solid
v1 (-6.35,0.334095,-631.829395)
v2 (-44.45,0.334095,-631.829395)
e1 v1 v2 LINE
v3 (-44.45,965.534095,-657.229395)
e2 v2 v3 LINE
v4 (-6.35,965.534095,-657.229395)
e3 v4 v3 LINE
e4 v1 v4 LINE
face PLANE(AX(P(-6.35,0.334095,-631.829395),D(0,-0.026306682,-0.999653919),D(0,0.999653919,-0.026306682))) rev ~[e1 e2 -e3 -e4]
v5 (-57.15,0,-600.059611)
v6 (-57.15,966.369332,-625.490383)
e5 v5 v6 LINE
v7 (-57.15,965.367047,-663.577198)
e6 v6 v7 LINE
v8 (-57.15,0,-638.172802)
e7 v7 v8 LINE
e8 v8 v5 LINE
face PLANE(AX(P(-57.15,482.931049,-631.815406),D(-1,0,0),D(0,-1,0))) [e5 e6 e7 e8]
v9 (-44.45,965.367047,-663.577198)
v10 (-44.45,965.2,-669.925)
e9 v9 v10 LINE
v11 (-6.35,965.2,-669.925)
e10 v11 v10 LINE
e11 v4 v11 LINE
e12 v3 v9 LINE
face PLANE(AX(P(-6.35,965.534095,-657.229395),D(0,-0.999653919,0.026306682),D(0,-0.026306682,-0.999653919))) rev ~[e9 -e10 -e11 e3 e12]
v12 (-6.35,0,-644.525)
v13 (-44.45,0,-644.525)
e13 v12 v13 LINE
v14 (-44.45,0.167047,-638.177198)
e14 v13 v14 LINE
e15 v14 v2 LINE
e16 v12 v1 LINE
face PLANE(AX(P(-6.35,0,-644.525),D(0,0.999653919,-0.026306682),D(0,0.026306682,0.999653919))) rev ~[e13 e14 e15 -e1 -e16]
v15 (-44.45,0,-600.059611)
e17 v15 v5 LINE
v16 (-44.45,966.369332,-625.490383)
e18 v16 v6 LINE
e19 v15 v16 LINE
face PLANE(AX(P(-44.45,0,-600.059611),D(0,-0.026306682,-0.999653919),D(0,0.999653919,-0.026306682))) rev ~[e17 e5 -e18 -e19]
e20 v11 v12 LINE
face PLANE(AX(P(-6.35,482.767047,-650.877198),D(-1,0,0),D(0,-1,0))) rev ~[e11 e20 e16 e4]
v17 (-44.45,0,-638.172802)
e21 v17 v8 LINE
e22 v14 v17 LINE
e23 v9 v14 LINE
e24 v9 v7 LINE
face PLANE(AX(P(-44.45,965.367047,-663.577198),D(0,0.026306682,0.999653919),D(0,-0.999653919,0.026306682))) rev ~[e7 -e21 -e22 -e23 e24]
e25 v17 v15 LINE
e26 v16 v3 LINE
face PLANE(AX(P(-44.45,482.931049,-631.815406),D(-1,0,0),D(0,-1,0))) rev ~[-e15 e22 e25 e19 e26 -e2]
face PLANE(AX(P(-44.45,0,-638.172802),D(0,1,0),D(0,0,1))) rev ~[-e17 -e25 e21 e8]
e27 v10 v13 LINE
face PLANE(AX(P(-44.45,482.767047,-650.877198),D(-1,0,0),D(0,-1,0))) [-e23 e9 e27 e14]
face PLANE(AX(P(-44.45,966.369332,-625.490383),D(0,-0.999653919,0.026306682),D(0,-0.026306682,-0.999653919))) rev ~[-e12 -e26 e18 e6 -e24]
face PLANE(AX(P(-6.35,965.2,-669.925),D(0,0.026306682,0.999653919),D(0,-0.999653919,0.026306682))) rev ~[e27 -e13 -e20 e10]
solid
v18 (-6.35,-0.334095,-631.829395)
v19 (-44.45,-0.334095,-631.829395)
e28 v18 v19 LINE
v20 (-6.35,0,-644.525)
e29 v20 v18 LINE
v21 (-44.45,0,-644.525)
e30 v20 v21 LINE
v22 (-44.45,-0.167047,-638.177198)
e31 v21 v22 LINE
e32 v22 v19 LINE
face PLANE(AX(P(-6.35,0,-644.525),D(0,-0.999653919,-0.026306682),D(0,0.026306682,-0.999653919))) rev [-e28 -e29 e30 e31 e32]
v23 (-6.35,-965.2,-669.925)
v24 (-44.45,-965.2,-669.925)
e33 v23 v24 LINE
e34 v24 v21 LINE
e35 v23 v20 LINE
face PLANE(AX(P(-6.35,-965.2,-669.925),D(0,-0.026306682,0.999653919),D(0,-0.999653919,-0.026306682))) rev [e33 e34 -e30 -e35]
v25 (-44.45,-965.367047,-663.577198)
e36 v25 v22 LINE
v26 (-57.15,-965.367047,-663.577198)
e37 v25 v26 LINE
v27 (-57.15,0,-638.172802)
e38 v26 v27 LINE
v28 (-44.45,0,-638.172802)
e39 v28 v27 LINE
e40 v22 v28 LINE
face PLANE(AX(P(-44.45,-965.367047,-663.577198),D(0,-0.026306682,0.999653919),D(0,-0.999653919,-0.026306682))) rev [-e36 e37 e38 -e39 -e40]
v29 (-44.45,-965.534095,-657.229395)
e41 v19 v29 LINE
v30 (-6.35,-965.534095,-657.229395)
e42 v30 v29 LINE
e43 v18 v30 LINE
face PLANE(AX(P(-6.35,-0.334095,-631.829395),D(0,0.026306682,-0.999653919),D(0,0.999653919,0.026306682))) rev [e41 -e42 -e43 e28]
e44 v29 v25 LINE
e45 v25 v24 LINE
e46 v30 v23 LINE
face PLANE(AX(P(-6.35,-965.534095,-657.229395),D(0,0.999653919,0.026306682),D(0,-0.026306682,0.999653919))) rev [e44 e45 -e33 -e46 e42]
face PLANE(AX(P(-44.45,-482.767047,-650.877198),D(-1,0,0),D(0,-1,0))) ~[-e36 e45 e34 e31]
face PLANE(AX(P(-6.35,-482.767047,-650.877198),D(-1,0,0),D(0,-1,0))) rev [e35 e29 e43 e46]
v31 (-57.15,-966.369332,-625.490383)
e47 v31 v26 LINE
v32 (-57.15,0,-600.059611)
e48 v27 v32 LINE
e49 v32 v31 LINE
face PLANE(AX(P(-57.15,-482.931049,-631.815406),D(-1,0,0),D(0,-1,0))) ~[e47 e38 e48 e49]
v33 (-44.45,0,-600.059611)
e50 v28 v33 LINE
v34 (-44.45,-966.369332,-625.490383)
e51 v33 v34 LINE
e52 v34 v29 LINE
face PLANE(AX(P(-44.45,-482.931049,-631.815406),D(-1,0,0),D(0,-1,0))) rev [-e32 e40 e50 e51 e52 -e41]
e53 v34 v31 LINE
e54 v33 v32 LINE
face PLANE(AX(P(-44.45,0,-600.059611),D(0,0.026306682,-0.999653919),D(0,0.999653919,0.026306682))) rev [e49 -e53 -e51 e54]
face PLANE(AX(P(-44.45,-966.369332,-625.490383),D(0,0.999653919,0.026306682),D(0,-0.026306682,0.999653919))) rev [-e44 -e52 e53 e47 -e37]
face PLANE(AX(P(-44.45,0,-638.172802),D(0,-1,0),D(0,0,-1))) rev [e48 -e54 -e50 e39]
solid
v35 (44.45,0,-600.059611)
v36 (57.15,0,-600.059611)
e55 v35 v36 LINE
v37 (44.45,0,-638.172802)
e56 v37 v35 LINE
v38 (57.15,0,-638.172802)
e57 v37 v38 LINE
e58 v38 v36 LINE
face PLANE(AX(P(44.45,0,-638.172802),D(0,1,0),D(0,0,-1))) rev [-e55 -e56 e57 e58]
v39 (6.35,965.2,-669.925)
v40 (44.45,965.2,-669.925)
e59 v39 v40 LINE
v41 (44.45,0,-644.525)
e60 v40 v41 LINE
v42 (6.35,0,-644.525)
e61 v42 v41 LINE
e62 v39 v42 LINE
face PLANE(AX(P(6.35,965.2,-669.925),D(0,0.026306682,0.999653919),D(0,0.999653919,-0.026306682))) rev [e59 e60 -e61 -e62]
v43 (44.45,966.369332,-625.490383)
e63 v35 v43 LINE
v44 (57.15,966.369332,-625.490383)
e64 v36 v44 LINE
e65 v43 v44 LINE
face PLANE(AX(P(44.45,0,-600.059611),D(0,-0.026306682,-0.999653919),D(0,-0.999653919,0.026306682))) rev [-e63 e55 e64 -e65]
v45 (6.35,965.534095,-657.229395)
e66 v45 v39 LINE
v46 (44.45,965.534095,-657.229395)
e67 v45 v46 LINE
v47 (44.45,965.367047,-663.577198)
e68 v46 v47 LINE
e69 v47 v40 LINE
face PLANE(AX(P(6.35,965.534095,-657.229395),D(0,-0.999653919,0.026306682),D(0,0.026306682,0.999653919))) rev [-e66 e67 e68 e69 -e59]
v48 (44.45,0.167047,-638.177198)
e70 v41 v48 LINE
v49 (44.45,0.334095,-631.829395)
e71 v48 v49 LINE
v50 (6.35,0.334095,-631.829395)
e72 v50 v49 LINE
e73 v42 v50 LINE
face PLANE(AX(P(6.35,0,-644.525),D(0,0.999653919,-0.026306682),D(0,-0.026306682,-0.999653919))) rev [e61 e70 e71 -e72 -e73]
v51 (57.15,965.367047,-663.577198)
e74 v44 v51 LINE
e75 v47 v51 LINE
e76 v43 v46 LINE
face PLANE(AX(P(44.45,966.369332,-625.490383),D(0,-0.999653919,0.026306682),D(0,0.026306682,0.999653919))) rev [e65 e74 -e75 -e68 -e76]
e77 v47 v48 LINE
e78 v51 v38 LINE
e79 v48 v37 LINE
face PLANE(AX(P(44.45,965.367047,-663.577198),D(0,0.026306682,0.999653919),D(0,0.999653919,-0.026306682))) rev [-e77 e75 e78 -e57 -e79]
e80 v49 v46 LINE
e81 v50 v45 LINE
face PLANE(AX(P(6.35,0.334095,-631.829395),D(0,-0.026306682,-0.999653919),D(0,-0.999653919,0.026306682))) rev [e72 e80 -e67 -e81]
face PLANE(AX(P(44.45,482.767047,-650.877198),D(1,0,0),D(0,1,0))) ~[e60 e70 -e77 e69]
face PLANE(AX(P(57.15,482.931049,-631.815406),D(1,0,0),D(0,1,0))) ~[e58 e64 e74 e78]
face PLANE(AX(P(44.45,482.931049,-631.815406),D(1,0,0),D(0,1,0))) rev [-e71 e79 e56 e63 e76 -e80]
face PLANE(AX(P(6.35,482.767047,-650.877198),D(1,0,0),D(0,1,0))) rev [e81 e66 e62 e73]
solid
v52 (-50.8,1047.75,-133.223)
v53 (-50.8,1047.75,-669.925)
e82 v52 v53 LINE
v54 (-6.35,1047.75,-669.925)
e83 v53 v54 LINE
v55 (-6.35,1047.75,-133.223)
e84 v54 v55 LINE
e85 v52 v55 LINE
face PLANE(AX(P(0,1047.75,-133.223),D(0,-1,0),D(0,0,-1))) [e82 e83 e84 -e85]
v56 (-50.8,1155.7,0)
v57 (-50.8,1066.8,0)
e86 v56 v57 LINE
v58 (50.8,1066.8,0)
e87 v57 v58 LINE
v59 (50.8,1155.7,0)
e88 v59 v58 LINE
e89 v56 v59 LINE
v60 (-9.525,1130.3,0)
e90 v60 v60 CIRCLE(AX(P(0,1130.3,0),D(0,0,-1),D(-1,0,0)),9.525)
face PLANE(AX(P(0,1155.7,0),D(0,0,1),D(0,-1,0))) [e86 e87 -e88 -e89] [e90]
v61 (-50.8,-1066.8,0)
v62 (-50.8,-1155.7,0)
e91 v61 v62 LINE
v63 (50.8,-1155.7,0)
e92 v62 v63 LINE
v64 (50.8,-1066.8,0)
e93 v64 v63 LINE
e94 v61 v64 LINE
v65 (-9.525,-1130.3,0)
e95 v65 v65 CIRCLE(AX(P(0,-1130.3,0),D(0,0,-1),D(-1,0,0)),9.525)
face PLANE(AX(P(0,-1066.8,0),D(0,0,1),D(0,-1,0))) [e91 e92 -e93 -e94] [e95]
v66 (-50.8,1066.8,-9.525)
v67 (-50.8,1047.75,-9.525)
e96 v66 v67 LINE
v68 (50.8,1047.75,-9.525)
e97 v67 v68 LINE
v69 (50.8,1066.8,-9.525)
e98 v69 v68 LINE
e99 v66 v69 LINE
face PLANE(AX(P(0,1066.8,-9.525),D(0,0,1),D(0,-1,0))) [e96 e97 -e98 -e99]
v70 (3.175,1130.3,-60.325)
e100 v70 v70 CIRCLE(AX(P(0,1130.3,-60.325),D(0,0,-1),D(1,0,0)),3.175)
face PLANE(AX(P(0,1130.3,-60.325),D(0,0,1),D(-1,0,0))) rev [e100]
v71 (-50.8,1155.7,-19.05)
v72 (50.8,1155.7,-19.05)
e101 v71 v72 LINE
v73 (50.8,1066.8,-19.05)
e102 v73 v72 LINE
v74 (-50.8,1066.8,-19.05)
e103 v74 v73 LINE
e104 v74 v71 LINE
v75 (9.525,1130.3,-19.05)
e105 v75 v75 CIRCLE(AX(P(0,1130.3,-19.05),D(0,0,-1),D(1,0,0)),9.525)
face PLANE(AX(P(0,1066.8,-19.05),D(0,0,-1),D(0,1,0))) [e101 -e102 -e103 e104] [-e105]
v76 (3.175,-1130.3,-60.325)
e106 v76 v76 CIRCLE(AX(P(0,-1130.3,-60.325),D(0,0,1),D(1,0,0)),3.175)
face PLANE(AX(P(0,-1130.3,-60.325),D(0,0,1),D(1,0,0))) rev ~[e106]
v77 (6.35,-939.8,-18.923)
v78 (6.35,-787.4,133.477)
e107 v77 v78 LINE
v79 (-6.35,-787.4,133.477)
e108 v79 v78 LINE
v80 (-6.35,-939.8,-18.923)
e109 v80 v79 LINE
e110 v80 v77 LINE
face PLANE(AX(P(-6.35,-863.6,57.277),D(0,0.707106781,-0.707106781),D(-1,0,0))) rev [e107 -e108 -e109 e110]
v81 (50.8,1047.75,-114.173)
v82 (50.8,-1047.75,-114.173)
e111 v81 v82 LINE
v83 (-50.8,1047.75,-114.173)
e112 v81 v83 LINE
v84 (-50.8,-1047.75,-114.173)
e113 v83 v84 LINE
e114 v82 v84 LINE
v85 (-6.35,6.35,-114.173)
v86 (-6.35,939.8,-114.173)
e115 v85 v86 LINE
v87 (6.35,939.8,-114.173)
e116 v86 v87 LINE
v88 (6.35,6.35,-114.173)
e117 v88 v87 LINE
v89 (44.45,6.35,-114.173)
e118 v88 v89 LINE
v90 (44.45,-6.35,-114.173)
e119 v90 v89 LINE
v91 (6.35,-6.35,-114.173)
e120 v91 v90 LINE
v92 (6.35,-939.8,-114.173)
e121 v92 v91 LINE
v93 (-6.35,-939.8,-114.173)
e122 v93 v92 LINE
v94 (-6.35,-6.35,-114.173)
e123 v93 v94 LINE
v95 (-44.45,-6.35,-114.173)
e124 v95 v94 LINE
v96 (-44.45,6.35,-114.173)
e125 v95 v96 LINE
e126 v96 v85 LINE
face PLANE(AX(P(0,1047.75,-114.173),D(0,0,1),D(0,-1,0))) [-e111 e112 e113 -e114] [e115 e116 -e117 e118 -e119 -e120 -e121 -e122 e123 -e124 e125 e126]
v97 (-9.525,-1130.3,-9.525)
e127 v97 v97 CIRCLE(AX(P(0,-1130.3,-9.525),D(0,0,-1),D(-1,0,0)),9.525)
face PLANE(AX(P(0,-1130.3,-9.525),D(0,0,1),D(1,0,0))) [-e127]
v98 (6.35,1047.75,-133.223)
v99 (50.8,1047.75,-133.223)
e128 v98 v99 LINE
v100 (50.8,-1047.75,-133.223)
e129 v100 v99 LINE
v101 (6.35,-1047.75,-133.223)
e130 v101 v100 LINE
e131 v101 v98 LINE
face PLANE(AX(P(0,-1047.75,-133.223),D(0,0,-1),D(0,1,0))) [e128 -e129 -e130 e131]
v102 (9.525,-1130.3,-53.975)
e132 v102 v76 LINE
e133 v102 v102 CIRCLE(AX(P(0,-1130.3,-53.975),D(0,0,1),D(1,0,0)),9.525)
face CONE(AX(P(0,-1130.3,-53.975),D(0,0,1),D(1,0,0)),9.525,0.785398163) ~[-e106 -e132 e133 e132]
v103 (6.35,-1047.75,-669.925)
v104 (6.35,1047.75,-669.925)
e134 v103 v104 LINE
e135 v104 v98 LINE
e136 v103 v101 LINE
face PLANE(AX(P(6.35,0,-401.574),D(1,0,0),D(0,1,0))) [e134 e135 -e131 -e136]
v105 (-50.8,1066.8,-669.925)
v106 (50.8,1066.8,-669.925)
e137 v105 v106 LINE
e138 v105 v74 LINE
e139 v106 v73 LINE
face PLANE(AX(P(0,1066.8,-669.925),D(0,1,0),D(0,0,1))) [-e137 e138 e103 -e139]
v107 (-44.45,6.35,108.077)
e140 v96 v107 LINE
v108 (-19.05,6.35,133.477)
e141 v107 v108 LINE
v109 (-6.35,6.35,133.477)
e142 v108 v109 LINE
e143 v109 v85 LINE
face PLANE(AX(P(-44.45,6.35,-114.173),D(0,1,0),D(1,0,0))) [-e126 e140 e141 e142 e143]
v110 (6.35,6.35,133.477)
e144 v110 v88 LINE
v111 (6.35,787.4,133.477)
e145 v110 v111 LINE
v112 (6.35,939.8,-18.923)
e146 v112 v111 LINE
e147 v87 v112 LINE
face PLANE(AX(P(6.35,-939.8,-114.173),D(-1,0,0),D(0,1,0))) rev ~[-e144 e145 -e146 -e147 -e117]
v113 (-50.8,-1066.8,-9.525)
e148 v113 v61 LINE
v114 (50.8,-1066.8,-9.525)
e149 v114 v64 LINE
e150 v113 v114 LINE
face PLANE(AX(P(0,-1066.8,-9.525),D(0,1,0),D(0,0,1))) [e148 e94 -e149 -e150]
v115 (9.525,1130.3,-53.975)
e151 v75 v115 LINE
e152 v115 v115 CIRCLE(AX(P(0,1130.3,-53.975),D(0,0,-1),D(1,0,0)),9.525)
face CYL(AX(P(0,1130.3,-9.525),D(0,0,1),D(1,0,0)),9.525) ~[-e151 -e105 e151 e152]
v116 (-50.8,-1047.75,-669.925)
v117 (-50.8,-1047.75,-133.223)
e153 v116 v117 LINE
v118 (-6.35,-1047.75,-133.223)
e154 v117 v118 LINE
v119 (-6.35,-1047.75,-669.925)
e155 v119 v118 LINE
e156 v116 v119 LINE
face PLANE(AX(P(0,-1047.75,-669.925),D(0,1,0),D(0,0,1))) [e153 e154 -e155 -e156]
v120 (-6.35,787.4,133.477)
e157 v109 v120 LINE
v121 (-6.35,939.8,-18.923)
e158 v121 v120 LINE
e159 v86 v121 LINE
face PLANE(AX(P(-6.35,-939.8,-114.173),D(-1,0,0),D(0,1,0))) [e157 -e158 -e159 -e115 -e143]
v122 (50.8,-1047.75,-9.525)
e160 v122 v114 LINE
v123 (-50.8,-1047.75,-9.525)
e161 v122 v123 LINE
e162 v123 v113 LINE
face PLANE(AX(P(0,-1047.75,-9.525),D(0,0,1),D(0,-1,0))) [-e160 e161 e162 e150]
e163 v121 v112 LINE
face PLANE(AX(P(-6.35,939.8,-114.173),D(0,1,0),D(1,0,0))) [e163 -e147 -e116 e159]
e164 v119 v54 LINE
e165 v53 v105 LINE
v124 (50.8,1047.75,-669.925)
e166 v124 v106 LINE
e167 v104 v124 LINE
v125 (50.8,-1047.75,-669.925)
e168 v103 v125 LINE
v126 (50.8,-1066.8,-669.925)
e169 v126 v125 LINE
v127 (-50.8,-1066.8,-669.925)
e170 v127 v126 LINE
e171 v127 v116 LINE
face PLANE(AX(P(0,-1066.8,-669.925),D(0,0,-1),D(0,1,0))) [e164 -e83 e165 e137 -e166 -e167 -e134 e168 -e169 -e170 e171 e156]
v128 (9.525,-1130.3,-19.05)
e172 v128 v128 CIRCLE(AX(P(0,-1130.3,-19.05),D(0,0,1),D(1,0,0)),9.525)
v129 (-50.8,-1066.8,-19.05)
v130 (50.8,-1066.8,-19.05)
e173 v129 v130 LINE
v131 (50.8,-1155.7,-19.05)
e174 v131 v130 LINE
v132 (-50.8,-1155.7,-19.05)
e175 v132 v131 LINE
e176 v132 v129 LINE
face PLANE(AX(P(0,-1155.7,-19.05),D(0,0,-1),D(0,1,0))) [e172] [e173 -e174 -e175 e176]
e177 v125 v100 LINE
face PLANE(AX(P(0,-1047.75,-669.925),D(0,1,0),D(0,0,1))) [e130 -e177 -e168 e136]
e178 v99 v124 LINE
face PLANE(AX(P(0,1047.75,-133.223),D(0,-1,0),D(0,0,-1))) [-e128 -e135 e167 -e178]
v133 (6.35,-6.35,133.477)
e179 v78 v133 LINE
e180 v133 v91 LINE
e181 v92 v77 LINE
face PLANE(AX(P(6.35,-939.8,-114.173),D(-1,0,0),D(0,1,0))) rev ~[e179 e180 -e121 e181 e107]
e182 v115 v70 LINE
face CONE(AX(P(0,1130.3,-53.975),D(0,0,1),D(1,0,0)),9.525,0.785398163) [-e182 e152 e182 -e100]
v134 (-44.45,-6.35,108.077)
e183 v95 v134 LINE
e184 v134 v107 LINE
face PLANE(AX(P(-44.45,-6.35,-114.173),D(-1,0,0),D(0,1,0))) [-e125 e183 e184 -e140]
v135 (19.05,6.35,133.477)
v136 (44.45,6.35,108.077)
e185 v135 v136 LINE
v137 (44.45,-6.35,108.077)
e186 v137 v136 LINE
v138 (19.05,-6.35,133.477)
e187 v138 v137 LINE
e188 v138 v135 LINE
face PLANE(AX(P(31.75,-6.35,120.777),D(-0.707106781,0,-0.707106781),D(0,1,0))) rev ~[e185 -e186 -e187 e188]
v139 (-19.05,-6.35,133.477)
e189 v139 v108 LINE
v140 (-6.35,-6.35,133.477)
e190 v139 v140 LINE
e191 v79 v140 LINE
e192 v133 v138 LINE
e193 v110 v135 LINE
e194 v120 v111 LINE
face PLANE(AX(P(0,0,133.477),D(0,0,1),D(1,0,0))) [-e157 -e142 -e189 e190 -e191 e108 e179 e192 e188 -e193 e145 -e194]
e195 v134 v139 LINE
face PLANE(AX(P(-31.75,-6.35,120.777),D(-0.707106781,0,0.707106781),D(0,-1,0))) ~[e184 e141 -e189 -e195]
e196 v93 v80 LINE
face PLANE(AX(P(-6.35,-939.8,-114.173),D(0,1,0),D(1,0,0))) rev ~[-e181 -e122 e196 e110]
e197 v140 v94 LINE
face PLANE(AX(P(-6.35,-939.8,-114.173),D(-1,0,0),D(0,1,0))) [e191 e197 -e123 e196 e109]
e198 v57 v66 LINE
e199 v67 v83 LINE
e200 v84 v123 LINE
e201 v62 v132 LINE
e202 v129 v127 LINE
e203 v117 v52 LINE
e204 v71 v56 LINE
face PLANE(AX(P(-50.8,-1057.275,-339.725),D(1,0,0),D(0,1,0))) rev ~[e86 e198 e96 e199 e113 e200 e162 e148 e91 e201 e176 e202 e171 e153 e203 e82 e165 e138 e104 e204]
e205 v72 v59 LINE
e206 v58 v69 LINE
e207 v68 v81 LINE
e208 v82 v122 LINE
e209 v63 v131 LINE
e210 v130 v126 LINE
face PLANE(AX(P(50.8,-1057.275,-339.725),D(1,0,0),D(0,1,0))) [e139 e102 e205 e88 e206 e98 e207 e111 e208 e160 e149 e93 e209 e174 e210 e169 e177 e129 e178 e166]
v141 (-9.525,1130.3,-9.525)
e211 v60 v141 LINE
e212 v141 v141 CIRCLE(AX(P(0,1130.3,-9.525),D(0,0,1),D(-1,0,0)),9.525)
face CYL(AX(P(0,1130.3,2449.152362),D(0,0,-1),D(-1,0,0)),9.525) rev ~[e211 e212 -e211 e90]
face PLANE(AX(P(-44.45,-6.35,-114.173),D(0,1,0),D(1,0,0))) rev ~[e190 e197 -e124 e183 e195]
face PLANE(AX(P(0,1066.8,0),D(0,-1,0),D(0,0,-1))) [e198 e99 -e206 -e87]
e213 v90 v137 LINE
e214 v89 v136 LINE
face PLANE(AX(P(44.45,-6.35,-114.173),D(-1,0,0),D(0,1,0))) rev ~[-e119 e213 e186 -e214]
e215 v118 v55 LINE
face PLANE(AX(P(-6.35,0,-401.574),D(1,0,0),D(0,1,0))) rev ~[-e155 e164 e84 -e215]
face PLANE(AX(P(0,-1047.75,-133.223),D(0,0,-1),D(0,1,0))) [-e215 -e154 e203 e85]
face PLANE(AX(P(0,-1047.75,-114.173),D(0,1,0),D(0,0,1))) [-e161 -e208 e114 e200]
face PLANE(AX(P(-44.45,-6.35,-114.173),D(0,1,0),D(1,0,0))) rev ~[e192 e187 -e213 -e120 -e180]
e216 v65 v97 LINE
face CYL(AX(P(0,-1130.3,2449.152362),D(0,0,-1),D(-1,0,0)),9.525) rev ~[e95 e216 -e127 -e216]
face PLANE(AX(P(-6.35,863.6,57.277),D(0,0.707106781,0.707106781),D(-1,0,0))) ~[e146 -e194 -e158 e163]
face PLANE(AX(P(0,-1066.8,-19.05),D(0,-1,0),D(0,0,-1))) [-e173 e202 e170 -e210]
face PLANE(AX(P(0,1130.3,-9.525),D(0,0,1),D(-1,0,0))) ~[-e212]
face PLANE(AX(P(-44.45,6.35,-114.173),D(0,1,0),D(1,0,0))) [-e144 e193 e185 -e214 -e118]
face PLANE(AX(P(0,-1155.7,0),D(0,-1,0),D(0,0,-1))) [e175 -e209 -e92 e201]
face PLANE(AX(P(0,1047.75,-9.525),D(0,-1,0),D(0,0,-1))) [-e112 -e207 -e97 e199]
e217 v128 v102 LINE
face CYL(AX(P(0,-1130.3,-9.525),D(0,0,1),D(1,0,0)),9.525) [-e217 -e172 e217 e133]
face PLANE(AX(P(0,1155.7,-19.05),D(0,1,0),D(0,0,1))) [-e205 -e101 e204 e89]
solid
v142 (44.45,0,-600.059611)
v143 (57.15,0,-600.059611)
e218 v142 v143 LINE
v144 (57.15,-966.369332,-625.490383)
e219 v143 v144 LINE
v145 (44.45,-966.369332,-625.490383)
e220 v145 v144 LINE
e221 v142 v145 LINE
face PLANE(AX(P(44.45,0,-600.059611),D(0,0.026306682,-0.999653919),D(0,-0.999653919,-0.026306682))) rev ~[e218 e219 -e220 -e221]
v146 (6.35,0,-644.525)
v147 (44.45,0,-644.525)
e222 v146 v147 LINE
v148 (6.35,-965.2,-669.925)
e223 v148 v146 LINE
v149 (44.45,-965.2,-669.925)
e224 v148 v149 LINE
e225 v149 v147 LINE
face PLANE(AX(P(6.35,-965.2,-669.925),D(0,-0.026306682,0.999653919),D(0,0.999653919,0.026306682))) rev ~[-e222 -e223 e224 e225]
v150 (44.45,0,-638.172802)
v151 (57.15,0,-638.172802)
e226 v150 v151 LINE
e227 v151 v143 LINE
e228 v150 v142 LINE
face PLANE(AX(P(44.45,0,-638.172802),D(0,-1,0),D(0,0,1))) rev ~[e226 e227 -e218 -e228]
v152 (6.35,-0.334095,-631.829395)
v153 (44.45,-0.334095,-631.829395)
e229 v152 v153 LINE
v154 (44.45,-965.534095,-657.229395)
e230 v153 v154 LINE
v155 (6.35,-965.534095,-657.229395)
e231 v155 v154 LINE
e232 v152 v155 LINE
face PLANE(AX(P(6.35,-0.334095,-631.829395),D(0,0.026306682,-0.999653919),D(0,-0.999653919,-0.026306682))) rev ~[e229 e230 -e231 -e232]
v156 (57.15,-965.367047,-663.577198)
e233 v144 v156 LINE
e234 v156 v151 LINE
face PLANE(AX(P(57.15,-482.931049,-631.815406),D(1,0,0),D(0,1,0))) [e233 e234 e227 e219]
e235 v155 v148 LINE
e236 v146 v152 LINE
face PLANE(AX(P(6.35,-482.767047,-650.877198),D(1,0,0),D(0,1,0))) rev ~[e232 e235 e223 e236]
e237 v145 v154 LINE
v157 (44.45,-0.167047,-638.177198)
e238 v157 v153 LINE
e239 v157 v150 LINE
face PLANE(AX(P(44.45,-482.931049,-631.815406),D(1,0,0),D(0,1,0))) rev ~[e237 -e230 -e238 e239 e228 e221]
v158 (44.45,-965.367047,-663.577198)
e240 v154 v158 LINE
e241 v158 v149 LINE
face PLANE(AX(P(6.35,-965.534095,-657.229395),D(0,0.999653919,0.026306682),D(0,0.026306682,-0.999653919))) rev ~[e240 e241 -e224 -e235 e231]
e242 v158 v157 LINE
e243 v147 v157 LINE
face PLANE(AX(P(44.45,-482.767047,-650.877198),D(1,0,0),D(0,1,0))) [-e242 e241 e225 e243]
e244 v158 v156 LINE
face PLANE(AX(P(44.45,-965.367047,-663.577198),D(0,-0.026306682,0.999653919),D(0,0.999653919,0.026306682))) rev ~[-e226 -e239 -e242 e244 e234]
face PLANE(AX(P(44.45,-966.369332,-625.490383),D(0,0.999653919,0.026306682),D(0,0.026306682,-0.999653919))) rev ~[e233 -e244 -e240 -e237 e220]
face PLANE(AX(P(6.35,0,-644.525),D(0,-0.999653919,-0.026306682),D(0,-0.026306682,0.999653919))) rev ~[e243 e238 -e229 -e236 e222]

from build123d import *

# Parameters (mm, degrees)
F0_W      = 1047.75
F0_H      = 19.05
F1_DEPTH  = 50.8
F2_W      = 2095.5
F2_H      = 536.702
F3_DEPTH  = 6.35
F4_W      = 12.7
F4_H      = 1879.6
F5_DEPTH  = 247.65
F6_SIZE   = 152.4
F7_W      = 88.9
F7_H      = 12.7
F8_DEPTH  = 247.65
F9_SIZE   = 25.4
F11_D     = 19.05
F13_R     = 9.525
F14_DEPTH = 50.8
F15_SIZE  = 6.35
F18_DEPTH = 38.1
F20_DEPTH = 12.7


with BuildPart() as f1:
    # F0 (on Right) → F1 (new body, symmetric)
    with BuildSketch(Plane.YZ):
        Polygon((-1047.75, -9.525), (-1066.8, -9.525), (-1066.8, -19.05), (-1066.8, -669.925), (-1047.75, -669.925), (-1047.75, -133.223), (-1047.75, -114.173), align=None)
        Polygon((-1066.8, 0), (-1155.7, 0), (-1155.7, -19.05), (-1066.8, -19.05), (-1066.8, -9.525), align=None)
        with Locations((-523.875, -123.698)):
            Rectangle(F0_W, F0_H)
        with Locations((523.875, -123.698)):
            Rectangle(F0_W, F0_H)
        Polygon((1047.75, -9.525), (1047.75, -114.173), (1047.75, -133.223), (1047.75, -669.925), (1066.8, -669.925), (1066.8, -19.05), (1066.8, -9.525), align=None)
        Polygon((1066.8, 0), (1066.8, -9.525), (1066.8, -19.05), (1155.7, -19.05), (1155.7, 0), align=None)
    extrude(amount=F1_DEPTH, both=True)

    # F2 (on Right) → F3 (join, symmetric)
    with BuildSketch(Plane.YZ):
        with Locations((0, -401.574)):
            Rectangle(F2_W, F2_H)
    extrude(amount=F3_DEPTH, both=True)

    # F4 (on face) → F5 (join)
    with BuildSketch(Plane.XY.offset(-114.173)):
        Rectangle(F4_W, F4_H)
    extrude(amount=F5_DEPTH)

    # F6
    f6_edges = [f1.edges().sort_by_distance(p)[0] for p in [
        (0, -939.8, 133.477),
        (0, 939.8, 133.477),
    ]]
    chamfer(f6_edges, length=F6_SIZE)

    # F7 (on face) → F8 (join)
    with BuildSketch(Plane.XY.offset(-114.173)):
        Rectangle(F7_W, F7_H)
    extrude(amount=F8_DEPTH)

    # F9
    f9_edges = [f1.edges().sort_by_distance(p)[0] for p in [
        (44.45, 0, 133.477),
        (-44.45, 0, 133.477),
    ]]
    chamfer(f9_edges, length=F9_SIZE)

    # F11 (through all)
    with Locations(Plane.XY):
        with Locations((0, -1130.3), (0, 1130.3)):
            Hole(F11_D / 2)

    # F13 (on offset) → F14 (join)
    with BuildSketch(Plane.XY.offset(-9.525)):
        with Locations((0, -1130.3)):
            Circle(F13_R)
    extrude(amount=-F14_DEPTH)

    # F15
    f15_edges = [f1.edges().sort_by_distance(p)[0] for p in [
        (-9.525, -1130.3, -60.325),
    ]]
    chamfer(f15_edges, length=F15_SIZE)

    # F16: F1 across plane


with BuildPart() as f1_1:
    add(f1.part)
    add(f1.part.mirror(Plane.XZ))


with BuildPart() as f18:
    # F17 (on face) → F18 (new body)
    with BuildSketch(Plane.YZ.offset(6.35)):
        Polygon((-965.5340948625, -657.2293952242), (-965.2, -669.925), (0, -644.525), (-0.3340948625, -631.8293952242), align=None)
    extrude(amount=F18_DEPTH)

    # F19 (on face) → F20 (join)
    with BuildSketch(Plane.YZ.offset(44.45)):
        Polygon((-966.3693320188, -625.4903832848), (-965.3670474312, -663.5771976121), (0, -638.1728016271), (0, -600.0596113895), align=None)
    extrude(amount=F20_DEPTH)


with BuildPart() as f21_1:
    # F21: instance of F18
    add(f18.part.mirror(Plane.XZ))


with BuildPart() as f22_1:
    # F22: instance of F18
    add(f18.part.mirror(Plane.YZ))


with BuildPart() as f23_1:
    # F23: instance of F22_1
    add(f22_1.part.mirror(Plane.XZ))


solid = Compound([f1_1.part, f18.part, f21_1.part, f22_1.part, f23_1.part])
